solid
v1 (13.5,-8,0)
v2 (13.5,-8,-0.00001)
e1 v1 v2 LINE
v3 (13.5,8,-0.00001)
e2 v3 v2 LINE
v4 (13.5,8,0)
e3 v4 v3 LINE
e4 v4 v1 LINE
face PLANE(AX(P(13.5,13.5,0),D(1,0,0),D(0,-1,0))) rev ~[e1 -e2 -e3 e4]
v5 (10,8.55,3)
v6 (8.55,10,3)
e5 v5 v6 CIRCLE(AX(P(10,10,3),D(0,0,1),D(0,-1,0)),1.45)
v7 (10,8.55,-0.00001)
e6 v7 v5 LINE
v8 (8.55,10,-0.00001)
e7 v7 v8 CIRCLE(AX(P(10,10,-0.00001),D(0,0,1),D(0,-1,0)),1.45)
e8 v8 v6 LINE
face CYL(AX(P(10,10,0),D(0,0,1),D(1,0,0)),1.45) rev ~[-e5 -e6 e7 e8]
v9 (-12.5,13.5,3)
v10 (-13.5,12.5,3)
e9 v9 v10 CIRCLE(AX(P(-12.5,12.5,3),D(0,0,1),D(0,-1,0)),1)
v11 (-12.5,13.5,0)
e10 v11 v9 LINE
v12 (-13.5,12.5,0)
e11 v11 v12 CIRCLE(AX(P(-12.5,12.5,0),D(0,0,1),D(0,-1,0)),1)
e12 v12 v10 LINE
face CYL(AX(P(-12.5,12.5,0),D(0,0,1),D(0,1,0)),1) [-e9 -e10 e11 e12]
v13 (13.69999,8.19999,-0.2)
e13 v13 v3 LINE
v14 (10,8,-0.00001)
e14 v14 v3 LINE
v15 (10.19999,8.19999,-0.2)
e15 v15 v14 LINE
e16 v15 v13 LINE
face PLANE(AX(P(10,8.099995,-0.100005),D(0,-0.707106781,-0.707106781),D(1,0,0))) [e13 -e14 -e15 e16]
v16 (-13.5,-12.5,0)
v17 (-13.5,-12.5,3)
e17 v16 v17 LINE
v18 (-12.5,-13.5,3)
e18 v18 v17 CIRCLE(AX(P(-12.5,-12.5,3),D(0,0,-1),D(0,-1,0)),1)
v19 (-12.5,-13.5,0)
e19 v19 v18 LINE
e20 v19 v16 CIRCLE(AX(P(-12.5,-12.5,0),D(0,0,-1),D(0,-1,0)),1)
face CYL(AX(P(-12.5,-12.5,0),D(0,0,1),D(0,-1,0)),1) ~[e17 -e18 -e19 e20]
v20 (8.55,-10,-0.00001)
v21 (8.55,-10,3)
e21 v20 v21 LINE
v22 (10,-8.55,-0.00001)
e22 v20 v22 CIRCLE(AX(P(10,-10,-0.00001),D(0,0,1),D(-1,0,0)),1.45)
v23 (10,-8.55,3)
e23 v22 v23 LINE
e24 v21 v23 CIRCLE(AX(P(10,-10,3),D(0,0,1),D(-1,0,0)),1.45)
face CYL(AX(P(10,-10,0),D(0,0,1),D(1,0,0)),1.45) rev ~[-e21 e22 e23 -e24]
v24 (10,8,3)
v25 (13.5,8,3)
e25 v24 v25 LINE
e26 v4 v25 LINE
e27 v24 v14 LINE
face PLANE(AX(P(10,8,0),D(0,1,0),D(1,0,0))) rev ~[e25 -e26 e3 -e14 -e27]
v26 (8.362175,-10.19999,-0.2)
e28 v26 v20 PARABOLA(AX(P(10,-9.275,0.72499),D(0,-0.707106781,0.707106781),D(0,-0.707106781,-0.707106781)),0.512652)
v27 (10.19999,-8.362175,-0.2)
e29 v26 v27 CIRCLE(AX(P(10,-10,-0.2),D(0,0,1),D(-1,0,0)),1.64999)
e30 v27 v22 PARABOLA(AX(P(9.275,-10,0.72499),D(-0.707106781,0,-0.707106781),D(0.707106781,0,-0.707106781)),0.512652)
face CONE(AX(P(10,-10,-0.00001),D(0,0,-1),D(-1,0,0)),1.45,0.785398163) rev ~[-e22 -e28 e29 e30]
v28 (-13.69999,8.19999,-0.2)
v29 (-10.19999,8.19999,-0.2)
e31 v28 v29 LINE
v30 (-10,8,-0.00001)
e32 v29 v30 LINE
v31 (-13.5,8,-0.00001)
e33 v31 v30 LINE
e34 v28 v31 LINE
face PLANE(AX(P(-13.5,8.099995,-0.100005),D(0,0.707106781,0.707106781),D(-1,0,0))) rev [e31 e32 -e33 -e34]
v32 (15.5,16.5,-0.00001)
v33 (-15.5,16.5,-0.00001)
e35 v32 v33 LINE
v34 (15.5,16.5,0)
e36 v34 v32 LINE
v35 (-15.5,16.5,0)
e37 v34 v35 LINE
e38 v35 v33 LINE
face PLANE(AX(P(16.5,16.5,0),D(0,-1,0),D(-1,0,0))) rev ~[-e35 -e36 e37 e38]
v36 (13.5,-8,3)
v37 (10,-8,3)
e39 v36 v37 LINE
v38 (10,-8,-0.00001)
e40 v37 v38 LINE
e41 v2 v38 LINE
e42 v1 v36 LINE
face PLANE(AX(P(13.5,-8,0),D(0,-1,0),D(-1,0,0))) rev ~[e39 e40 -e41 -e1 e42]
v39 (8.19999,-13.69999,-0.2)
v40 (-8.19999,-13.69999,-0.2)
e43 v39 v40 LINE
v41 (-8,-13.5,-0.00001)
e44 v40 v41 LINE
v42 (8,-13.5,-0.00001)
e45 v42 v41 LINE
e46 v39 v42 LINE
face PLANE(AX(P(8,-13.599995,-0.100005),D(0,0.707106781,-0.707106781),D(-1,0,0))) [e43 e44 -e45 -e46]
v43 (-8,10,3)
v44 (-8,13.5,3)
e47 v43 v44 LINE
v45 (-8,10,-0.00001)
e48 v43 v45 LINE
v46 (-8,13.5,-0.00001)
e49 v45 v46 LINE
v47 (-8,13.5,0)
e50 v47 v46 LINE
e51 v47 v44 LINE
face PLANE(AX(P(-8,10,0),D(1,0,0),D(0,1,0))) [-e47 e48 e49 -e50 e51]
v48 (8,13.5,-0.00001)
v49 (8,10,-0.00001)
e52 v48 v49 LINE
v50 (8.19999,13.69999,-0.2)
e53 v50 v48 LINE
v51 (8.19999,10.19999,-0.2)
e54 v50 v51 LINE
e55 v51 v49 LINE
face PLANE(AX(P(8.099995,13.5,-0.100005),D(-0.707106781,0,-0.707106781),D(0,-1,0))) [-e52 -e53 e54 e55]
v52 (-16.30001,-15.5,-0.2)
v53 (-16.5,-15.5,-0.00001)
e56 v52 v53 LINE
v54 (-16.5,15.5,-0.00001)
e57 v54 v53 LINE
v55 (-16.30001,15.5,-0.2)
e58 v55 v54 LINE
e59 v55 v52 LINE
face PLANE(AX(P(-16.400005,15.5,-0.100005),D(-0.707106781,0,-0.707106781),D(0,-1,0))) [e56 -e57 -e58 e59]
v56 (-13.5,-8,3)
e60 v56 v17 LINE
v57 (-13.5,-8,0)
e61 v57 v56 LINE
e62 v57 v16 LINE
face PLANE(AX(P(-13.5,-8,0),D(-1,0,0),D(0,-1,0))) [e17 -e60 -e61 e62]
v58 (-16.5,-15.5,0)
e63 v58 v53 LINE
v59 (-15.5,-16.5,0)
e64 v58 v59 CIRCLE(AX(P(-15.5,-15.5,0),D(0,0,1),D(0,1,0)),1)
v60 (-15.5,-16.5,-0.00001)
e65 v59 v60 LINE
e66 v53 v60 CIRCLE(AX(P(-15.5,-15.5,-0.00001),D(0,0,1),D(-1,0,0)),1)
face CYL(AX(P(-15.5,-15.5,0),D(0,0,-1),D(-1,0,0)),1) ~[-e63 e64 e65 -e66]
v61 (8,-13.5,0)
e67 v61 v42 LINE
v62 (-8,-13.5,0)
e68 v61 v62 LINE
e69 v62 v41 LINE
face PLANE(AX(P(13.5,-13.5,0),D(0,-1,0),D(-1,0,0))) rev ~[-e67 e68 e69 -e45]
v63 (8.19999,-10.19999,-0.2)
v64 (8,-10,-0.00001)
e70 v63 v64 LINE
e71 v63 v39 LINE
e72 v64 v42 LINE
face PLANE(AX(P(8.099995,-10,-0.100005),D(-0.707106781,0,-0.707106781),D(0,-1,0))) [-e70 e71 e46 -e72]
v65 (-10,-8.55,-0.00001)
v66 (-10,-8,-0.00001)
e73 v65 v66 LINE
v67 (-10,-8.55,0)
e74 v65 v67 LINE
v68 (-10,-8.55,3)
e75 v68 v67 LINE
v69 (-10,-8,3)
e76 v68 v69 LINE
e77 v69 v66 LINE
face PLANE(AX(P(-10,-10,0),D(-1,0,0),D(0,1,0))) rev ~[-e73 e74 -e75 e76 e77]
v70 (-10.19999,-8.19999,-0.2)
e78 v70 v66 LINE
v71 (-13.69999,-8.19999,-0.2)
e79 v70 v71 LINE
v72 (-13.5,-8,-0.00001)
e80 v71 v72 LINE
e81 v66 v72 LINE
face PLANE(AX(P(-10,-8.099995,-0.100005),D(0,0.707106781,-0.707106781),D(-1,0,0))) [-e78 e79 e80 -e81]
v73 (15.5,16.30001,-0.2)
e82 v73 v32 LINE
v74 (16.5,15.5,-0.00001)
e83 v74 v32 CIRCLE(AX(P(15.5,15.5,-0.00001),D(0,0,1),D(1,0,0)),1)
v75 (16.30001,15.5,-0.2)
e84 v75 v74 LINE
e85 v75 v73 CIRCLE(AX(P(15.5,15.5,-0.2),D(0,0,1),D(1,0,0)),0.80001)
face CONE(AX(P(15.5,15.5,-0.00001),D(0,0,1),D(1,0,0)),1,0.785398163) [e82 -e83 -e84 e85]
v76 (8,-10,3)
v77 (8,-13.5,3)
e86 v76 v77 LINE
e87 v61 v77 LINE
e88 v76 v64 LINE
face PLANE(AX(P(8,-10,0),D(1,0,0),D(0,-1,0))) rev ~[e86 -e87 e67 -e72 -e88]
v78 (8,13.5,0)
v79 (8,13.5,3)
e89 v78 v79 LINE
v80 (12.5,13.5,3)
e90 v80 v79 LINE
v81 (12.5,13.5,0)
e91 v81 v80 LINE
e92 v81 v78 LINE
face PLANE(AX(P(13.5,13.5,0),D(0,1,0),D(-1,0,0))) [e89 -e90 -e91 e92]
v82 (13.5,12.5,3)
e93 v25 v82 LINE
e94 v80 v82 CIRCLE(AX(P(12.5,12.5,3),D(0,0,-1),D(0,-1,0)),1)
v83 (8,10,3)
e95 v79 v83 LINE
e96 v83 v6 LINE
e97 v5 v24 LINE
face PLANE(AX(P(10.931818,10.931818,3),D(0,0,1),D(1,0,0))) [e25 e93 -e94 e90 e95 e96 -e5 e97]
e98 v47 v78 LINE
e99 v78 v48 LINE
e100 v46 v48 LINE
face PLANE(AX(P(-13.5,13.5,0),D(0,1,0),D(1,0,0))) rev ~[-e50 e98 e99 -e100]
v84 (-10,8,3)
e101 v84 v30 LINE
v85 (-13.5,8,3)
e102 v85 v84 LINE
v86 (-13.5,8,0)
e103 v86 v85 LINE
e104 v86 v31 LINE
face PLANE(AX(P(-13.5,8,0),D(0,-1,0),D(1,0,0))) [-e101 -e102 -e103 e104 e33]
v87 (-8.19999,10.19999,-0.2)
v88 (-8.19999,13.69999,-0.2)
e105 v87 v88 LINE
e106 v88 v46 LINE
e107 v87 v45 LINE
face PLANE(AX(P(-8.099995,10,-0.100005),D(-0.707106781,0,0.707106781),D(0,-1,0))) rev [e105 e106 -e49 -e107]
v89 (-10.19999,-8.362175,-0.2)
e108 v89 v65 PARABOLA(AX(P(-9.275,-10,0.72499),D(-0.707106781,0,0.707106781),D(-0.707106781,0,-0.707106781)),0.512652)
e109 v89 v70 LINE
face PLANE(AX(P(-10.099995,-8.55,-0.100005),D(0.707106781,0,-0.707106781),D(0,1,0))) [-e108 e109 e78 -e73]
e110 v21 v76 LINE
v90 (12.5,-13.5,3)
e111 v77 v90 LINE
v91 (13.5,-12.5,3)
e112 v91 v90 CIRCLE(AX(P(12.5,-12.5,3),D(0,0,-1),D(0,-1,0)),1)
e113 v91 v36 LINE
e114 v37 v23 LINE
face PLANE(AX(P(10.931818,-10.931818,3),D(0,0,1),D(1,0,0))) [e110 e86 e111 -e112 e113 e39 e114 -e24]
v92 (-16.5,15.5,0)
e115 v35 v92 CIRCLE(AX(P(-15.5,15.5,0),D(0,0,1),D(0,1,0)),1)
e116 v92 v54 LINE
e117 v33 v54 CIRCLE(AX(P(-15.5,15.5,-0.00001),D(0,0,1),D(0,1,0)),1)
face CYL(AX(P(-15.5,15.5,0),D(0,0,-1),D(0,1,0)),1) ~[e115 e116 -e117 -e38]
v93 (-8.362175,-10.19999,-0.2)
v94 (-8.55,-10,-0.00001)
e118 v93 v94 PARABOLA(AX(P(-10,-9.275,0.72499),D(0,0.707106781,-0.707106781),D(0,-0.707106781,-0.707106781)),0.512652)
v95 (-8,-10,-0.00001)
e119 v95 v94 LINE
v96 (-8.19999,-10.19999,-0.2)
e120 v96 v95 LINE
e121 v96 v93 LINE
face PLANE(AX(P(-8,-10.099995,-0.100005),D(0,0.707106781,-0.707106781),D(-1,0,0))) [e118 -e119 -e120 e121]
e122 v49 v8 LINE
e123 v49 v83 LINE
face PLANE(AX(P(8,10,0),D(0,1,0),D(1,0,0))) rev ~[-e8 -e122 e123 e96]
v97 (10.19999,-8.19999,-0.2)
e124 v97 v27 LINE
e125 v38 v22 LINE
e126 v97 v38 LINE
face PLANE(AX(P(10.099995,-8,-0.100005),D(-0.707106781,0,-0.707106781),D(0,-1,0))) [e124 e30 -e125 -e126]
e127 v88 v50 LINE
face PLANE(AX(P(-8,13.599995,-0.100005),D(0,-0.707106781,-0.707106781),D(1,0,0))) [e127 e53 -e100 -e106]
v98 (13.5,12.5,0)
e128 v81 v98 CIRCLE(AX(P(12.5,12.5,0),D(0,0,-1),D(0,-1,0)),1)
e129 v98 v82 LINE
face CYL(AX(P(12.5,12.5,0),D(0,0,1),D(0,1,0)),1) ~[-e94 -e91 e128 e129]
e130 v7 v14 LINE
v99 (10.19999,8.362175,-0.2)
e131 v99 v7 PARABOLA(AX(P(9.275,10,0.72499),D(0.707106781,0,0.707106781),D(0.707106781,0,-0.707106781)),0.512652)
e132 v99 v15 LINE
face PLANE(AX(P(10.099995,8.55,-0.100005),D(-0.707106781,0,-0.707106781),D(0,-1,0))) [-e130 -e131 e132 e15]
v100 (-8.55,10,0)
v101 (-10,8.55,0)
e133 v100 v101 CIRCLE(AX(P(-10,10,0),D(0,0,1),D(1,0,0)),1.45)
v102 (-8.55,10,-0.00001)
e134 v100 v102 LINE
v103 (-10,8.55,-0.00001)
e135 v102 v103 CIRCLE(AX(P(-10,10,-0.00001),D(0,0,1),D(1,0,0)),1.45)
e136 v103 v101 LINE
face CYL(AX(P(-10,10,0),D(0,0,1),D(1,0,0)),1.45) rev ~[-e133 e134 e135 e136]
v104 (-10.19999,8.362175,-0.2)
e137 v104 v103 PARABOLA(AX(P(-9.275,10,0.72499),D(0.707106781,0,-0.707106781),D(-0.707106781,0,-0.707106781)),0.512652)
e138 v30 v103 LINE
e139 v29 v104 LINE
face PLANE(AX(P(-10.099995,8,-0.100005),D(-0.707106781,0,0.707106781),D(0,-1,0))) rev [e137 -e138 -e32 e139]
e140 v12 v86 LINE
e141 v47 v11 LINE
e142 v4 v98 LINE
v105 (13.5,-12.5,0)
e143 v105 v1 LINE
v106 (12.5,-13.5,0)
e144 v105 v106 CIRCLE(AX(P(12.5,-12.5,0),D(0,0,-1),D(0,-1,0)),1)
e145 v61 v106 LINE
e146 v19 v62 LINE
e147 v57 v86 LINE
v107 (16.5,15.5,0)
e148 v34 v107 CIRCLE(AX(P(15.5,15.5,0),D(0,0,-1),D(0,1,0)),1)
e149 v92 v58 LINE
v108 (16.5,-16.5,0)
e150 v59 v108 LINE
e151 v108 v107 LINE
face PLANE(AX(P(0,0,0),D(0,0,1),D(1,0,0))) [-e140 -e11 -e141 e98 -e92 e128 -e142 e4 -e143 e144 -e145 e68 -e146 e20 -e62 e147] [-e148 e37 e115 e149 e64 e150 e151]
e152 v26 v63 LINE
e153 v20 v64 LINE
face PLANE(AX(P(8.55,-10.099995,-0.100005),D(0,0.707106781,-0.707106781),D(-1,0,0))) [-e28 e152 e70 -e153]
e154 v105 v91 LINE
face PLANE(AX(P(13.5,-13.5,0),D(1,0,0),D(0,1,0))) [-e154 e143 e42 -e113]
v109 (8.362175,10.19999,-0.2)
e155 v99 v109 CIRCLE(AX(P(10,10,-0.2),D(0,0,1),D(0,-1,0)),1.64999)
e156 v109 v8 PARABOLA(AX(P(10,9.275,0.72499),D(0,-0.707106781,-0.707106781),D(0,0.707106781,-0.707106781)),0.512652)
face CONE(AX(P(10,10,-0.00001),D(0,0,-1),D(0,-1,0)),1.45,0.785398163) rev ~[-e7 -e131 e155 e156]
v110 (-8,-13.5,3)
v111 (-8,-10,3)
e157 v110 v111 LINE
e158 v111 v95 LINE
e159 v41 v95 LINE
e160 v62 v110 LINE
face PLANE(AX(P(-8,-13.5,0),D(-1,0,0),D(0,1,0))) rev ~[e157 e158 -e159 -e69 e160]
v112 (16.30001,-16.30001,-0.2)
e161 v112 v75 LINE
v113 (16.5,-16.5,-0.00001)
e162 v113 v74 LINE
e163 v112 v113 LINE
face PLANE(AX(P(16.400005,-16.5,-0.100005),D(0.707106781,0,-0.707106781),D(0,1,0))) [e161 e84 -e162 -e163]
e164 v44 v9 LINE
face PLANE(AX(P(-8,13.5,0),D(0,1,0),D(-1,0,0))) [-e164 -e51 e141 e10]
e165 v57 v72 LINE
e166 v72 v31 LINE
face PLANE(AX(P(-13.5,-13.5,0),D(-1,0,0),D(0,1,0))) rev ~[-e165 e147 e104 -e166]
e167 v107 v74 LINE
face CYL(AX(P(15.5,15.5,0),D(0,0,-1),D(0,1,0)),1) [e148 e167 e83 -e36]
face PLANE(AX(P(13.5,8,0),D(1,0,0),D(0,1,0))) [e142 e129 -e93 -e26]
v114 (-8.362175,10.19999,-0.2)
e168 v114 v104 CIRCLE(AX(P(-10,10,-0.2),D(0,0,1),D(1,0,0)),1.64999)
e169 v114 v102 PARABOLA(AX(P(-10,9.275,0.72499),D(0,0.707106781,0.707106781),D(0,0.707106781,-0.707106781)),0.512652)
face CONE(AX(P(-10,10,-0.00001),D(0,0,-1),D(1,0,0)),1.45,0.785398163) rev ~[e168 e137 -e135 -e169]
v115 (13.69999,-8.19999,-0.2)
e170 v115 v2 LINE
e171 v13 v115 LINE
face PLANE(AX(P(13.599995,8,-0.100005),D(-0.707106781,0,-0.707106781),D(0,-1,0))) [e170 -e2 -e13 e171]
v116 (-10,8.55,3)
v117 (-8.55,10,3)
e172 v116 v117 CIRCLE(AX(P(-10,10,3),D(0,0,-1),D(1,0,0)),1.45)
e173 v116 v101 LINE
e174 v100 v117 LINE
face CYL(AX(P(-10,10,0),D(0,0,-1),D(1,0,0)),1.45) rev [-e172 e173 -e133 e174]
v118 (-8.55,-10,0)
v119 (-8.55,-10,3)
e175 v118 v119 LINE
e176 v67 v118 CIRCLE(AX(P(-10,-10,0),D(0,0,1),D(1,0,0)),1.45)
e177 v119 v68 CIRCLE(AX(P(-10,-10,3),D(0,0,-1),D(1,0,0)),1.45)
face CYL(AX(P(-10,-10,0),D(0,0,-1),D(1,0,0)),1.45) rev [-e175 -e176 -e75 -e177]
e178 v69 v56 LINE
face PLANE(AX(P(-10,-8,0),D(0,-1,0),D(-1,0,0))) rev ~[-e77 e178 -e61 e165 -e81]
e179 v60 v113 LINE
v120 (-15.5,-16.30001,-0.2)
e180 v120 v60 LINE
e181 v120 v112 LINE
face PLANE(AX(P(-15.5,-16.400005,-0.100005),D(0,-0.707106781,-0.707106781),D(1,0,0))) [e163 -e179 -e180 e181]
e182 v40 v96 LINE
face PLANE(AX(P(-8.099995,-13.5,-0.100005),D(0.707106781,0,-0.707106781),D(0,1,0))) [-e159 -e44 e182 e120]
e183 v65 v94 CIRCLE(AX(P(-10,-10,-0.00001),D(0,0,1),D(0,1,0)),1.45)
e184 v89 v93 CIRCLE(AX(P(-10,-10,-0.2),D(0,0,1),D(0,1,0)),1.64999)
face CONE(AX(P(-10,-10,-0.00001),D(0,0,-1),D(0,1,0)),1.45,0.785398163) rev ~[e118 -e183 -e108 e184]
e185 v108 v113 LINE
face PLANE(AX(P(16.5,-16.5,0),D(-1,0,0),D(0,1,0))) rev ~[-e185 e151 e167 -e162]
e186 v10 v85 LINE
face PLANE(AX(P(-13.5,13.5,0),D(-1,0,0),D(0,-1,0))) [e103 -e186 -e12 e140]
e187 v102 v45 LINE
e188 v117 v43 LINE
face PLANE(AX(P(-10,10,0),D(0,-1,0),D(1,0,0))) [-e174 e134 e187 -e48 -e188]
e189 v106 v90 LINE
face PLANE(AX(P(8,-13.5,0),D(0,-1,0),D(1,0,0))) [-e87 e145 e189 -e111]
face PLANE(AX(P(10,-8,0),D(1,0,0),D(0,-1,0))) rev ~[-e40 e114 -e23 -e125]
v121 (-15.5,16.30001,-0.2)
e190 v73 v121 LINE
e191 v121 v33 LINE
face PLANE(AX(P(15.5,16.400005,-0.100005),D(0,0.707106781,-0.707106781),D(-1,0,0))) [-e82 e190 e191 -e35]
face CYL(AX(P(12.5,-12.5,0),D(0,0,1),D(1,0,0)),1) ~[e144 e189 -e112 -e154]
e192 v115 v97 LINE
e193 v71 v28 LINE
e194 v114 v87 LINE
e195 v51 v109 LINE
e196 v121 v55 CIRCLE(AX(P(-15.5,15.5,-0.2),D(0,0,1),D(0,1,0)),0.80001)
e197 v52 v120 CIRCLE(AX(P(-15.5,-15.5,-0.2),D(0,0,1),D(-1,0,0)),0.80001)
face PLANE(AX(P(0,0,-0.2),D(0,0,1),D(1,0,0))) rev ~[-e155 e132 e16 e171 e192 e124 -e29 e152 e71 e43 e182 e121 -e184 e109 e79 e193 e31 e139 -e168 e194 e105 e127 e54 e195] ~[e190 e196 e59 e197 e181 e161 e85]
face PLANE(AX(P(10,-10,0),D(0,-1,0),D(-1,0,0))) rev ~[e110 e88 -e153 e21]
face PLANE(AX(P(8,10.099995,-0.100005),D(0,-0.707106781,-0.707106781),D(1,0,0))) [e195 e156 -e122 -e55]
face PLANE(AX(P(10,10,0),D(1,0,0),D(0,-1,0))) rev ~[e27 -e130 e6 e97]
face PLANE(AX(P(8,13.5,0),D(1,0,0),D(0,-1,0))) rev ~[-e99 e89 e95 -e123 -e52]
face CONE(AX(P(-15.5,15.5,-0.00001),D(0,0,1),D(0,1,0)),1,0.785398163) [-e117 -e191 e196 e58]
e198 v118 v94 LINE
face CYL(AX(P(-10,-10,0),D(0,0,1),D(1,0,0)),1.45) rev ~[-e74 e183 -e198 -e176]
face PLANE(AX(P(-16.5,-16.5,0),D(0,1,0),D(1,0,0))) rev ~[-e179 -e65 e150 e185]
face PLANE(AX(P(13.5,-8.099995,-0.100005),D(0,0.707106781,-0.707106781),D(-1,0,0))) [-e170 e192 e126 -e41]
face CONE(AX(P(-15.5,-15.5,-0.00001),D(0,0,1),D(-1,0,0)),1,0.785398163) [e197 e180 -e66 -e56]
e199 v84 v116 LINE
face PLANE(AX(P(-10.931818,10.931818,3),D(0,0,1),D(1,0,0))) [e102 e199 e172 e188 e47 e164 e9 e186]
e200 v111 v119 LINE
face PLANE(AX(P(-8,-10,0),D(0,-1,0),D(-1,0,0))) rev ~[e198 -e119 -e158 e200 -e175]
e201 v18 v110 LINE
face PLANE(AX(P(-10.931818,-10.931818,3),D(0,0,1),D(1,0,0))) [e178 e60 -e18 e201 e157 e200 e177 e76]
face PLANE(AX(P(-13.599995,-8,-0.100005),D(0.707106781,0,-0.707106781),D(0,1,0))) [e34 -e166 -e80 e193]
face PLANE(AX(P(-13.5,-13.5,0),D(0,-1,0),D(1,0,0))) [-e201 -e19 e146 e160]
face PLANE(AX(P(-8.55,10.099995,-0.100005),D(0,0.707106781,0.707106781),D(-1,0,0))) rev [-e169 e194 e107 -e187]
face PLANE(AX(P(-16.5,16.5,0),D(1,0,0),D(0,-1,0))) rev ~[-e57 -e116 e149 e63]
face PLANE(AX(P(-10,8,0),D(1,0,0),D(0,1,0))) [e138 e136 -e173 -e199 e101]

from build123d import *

# Parameters (mm, degrees)
F1_R          = 1.45
F6_DEPTH      = 0.201
F6_DEPTH_BACK = 3.001
F7_R          = 1
F8_SIZE       = 0.19999


# Not quite as in the source:
# - a fillet or chamfer is up to 0.001 mm smaller than in the source, because OpenCascade refuses the exact size


with BuildPart() as f4:
    # F4: sweep along a path in F2
    with BuildLine(Plane.XZ) as f4_path:
        Line((0, 0), (0, -0.2))
    # F3 (on Top) → F4 (sweep)
    with BuildSketch(Plane.XY):
        Polygon((16.5, 16.5), (0, 16.5), (-16.5, 16.5), (-16.5, 0), (-16.5, -16.5), (0, -16.5), (16.5, -16.5), (16.5, 0), align=None)
        Polygon((0, 13.5), (8, 13.5), (13.5, 13.5), (13.5, 8), (13.5, 0), (13.5, -8), (13.5, -13.5), (8, -13.5), (0, -13.5), (-8, -13.5), (-13.5, -13.5), (-13.5, -8), (-13.5, 0), (-13.5, 8), (-13.5, 13.5), (-8, 13.5), align=None, mode=Mode.SUBTRACT)
        Polygon((-10, -8), (-13.5, -8), (-13.5, -13.5), (-8, -13.5), (-8, -10), (-10, -10), align=None)
        Polygon((-8, 10), (-8, 13.5), (-13.5, 13.5), (-13.5, 8), (-10, 8), (-10, 10), align=None)
        Polygon((8, 13.5), (8, 10), (10, 10), (10, 8), (13.5, 8), (13.5, 13.5), align=None)
        Polygon((13.5, -13.5), (13.5, -8), (10, -8), (10, -10), (8, -10), (8, -13.5), align=None)
    sweep(path=f4_path.line)

    # F5: sweep along a path in F2
    with BuildLine(Plane.XZ) as f5_path:
        Line((0, 0), (0, 3))
    # F3 (on Top) → F5 (sweep)
    with BuildSketch(Plane.XY):
        Polygon((-8, 10), (-8, 13.5), (-13.5, 13.5), (-13.5, 8), (-10, 8), (-10, 10), align=None)
        Polygon((8, 13.5), (8, 10), (10, 10), (10, 8), (13.5, 8), (13.5, 13.5), align=None)
        Polygon((-10, -8), (-13.5, -8), (-13.5, -13.5), (-8, -13.5), (-8, -10), (-10, -10), align=None)
        Polygon((13.5, -13.5), (13.5, -8), (10, -8), (10, -10), (8, -10), (8, -13.5), align=None)
    sweep(path=f5_path.line)

    # F1 (on Top) → F6 (cut, two sides)
    with BuildSketch(Plane.XY) as f6_sk:
        with Locations((10, 10)):
            Circle(F1_R)
        with Locations((-10, 10)):
            Circle(F1_R)
        with Locations((-10, -10)):
            Circle(F1_R)
        with Locations((10, -10)):
            Circle(F1_R)
    extrude(amount=-F6_DEPTH, mode=Mode.SUBTRACT)
    extrude(f6_sk.sketch, amount=F6_DEPTH_BACK, mode=Mode.SUBTRACT)

    # F7
    f7_edges = [f4.edges().sort_by_distance(p)[0] for p in [
        (16.5, 16.5, -0.1),
        (13.5, -13.5, 1.5),
        (13.5, 13.5, 1.5),
        (-13.5, -13.5, 1.5),
        (-16.5, -16.5, -0.1),
        (-13.5, 13.5, 1.5),
        (-16.5, 16.5, -0.1),
    ]]
    fillet(f7_edges, radius=F7_R)

    # F8 (size 0.2 in the source; OpenCascade refuses exactly that, so slightly less here)
    f8_edges = [f4.edges().sort_by_distance(p)[0] for p in [
        (0, 16.5, -0.2),
        (16.207107, 16.207107, -0.2),
        (-16.207107, 16.207107, -0.2),
        (16.5, -0.5, -0.2),
        (-16.5, 0, -0.2),
        (0.5, -16.5, -0.2),
        (-16.207107, -16.207107, -0.2),
        (-13.5, 0, -0.2),
        (-11.75, 8, -0.2),
        (-10, 8.275, -0.2),
        (-11.025305, 11.025305, -0.2),
        (-8.275, 10, -0.2),
        (-8, 11.75, -0.2),
        (0, 13.5, -0.2),
        (8, 11.75, -0.2),
        (8.275, 10, -0.2),
        (11.025305, 11.025305, -0.2),
        (10, 8.275, -0.2),
        (11.75, 8, -0.2),
        (13.5, 0, -0.2),
        (11.75, -8, -0.2),
        (10, -8.275, -0.2),
        (11.025305, -11.025305, -0.2),
        (8.275, -10, -0.2),
        (8, -11.75, -0.2),
        (0, -13.5, -0.2),
        (-8, -11.75, -0.2),
        (-8.275, -10, -0.2),
        (-11.025305, -11.025305, -0.2),
        (-10, -8.275, -0.2),
        (-11.75, -8, -0.2),
    ]]
    chamfer(f8_edges, length=F8_SIZE)


solid = f4.part
